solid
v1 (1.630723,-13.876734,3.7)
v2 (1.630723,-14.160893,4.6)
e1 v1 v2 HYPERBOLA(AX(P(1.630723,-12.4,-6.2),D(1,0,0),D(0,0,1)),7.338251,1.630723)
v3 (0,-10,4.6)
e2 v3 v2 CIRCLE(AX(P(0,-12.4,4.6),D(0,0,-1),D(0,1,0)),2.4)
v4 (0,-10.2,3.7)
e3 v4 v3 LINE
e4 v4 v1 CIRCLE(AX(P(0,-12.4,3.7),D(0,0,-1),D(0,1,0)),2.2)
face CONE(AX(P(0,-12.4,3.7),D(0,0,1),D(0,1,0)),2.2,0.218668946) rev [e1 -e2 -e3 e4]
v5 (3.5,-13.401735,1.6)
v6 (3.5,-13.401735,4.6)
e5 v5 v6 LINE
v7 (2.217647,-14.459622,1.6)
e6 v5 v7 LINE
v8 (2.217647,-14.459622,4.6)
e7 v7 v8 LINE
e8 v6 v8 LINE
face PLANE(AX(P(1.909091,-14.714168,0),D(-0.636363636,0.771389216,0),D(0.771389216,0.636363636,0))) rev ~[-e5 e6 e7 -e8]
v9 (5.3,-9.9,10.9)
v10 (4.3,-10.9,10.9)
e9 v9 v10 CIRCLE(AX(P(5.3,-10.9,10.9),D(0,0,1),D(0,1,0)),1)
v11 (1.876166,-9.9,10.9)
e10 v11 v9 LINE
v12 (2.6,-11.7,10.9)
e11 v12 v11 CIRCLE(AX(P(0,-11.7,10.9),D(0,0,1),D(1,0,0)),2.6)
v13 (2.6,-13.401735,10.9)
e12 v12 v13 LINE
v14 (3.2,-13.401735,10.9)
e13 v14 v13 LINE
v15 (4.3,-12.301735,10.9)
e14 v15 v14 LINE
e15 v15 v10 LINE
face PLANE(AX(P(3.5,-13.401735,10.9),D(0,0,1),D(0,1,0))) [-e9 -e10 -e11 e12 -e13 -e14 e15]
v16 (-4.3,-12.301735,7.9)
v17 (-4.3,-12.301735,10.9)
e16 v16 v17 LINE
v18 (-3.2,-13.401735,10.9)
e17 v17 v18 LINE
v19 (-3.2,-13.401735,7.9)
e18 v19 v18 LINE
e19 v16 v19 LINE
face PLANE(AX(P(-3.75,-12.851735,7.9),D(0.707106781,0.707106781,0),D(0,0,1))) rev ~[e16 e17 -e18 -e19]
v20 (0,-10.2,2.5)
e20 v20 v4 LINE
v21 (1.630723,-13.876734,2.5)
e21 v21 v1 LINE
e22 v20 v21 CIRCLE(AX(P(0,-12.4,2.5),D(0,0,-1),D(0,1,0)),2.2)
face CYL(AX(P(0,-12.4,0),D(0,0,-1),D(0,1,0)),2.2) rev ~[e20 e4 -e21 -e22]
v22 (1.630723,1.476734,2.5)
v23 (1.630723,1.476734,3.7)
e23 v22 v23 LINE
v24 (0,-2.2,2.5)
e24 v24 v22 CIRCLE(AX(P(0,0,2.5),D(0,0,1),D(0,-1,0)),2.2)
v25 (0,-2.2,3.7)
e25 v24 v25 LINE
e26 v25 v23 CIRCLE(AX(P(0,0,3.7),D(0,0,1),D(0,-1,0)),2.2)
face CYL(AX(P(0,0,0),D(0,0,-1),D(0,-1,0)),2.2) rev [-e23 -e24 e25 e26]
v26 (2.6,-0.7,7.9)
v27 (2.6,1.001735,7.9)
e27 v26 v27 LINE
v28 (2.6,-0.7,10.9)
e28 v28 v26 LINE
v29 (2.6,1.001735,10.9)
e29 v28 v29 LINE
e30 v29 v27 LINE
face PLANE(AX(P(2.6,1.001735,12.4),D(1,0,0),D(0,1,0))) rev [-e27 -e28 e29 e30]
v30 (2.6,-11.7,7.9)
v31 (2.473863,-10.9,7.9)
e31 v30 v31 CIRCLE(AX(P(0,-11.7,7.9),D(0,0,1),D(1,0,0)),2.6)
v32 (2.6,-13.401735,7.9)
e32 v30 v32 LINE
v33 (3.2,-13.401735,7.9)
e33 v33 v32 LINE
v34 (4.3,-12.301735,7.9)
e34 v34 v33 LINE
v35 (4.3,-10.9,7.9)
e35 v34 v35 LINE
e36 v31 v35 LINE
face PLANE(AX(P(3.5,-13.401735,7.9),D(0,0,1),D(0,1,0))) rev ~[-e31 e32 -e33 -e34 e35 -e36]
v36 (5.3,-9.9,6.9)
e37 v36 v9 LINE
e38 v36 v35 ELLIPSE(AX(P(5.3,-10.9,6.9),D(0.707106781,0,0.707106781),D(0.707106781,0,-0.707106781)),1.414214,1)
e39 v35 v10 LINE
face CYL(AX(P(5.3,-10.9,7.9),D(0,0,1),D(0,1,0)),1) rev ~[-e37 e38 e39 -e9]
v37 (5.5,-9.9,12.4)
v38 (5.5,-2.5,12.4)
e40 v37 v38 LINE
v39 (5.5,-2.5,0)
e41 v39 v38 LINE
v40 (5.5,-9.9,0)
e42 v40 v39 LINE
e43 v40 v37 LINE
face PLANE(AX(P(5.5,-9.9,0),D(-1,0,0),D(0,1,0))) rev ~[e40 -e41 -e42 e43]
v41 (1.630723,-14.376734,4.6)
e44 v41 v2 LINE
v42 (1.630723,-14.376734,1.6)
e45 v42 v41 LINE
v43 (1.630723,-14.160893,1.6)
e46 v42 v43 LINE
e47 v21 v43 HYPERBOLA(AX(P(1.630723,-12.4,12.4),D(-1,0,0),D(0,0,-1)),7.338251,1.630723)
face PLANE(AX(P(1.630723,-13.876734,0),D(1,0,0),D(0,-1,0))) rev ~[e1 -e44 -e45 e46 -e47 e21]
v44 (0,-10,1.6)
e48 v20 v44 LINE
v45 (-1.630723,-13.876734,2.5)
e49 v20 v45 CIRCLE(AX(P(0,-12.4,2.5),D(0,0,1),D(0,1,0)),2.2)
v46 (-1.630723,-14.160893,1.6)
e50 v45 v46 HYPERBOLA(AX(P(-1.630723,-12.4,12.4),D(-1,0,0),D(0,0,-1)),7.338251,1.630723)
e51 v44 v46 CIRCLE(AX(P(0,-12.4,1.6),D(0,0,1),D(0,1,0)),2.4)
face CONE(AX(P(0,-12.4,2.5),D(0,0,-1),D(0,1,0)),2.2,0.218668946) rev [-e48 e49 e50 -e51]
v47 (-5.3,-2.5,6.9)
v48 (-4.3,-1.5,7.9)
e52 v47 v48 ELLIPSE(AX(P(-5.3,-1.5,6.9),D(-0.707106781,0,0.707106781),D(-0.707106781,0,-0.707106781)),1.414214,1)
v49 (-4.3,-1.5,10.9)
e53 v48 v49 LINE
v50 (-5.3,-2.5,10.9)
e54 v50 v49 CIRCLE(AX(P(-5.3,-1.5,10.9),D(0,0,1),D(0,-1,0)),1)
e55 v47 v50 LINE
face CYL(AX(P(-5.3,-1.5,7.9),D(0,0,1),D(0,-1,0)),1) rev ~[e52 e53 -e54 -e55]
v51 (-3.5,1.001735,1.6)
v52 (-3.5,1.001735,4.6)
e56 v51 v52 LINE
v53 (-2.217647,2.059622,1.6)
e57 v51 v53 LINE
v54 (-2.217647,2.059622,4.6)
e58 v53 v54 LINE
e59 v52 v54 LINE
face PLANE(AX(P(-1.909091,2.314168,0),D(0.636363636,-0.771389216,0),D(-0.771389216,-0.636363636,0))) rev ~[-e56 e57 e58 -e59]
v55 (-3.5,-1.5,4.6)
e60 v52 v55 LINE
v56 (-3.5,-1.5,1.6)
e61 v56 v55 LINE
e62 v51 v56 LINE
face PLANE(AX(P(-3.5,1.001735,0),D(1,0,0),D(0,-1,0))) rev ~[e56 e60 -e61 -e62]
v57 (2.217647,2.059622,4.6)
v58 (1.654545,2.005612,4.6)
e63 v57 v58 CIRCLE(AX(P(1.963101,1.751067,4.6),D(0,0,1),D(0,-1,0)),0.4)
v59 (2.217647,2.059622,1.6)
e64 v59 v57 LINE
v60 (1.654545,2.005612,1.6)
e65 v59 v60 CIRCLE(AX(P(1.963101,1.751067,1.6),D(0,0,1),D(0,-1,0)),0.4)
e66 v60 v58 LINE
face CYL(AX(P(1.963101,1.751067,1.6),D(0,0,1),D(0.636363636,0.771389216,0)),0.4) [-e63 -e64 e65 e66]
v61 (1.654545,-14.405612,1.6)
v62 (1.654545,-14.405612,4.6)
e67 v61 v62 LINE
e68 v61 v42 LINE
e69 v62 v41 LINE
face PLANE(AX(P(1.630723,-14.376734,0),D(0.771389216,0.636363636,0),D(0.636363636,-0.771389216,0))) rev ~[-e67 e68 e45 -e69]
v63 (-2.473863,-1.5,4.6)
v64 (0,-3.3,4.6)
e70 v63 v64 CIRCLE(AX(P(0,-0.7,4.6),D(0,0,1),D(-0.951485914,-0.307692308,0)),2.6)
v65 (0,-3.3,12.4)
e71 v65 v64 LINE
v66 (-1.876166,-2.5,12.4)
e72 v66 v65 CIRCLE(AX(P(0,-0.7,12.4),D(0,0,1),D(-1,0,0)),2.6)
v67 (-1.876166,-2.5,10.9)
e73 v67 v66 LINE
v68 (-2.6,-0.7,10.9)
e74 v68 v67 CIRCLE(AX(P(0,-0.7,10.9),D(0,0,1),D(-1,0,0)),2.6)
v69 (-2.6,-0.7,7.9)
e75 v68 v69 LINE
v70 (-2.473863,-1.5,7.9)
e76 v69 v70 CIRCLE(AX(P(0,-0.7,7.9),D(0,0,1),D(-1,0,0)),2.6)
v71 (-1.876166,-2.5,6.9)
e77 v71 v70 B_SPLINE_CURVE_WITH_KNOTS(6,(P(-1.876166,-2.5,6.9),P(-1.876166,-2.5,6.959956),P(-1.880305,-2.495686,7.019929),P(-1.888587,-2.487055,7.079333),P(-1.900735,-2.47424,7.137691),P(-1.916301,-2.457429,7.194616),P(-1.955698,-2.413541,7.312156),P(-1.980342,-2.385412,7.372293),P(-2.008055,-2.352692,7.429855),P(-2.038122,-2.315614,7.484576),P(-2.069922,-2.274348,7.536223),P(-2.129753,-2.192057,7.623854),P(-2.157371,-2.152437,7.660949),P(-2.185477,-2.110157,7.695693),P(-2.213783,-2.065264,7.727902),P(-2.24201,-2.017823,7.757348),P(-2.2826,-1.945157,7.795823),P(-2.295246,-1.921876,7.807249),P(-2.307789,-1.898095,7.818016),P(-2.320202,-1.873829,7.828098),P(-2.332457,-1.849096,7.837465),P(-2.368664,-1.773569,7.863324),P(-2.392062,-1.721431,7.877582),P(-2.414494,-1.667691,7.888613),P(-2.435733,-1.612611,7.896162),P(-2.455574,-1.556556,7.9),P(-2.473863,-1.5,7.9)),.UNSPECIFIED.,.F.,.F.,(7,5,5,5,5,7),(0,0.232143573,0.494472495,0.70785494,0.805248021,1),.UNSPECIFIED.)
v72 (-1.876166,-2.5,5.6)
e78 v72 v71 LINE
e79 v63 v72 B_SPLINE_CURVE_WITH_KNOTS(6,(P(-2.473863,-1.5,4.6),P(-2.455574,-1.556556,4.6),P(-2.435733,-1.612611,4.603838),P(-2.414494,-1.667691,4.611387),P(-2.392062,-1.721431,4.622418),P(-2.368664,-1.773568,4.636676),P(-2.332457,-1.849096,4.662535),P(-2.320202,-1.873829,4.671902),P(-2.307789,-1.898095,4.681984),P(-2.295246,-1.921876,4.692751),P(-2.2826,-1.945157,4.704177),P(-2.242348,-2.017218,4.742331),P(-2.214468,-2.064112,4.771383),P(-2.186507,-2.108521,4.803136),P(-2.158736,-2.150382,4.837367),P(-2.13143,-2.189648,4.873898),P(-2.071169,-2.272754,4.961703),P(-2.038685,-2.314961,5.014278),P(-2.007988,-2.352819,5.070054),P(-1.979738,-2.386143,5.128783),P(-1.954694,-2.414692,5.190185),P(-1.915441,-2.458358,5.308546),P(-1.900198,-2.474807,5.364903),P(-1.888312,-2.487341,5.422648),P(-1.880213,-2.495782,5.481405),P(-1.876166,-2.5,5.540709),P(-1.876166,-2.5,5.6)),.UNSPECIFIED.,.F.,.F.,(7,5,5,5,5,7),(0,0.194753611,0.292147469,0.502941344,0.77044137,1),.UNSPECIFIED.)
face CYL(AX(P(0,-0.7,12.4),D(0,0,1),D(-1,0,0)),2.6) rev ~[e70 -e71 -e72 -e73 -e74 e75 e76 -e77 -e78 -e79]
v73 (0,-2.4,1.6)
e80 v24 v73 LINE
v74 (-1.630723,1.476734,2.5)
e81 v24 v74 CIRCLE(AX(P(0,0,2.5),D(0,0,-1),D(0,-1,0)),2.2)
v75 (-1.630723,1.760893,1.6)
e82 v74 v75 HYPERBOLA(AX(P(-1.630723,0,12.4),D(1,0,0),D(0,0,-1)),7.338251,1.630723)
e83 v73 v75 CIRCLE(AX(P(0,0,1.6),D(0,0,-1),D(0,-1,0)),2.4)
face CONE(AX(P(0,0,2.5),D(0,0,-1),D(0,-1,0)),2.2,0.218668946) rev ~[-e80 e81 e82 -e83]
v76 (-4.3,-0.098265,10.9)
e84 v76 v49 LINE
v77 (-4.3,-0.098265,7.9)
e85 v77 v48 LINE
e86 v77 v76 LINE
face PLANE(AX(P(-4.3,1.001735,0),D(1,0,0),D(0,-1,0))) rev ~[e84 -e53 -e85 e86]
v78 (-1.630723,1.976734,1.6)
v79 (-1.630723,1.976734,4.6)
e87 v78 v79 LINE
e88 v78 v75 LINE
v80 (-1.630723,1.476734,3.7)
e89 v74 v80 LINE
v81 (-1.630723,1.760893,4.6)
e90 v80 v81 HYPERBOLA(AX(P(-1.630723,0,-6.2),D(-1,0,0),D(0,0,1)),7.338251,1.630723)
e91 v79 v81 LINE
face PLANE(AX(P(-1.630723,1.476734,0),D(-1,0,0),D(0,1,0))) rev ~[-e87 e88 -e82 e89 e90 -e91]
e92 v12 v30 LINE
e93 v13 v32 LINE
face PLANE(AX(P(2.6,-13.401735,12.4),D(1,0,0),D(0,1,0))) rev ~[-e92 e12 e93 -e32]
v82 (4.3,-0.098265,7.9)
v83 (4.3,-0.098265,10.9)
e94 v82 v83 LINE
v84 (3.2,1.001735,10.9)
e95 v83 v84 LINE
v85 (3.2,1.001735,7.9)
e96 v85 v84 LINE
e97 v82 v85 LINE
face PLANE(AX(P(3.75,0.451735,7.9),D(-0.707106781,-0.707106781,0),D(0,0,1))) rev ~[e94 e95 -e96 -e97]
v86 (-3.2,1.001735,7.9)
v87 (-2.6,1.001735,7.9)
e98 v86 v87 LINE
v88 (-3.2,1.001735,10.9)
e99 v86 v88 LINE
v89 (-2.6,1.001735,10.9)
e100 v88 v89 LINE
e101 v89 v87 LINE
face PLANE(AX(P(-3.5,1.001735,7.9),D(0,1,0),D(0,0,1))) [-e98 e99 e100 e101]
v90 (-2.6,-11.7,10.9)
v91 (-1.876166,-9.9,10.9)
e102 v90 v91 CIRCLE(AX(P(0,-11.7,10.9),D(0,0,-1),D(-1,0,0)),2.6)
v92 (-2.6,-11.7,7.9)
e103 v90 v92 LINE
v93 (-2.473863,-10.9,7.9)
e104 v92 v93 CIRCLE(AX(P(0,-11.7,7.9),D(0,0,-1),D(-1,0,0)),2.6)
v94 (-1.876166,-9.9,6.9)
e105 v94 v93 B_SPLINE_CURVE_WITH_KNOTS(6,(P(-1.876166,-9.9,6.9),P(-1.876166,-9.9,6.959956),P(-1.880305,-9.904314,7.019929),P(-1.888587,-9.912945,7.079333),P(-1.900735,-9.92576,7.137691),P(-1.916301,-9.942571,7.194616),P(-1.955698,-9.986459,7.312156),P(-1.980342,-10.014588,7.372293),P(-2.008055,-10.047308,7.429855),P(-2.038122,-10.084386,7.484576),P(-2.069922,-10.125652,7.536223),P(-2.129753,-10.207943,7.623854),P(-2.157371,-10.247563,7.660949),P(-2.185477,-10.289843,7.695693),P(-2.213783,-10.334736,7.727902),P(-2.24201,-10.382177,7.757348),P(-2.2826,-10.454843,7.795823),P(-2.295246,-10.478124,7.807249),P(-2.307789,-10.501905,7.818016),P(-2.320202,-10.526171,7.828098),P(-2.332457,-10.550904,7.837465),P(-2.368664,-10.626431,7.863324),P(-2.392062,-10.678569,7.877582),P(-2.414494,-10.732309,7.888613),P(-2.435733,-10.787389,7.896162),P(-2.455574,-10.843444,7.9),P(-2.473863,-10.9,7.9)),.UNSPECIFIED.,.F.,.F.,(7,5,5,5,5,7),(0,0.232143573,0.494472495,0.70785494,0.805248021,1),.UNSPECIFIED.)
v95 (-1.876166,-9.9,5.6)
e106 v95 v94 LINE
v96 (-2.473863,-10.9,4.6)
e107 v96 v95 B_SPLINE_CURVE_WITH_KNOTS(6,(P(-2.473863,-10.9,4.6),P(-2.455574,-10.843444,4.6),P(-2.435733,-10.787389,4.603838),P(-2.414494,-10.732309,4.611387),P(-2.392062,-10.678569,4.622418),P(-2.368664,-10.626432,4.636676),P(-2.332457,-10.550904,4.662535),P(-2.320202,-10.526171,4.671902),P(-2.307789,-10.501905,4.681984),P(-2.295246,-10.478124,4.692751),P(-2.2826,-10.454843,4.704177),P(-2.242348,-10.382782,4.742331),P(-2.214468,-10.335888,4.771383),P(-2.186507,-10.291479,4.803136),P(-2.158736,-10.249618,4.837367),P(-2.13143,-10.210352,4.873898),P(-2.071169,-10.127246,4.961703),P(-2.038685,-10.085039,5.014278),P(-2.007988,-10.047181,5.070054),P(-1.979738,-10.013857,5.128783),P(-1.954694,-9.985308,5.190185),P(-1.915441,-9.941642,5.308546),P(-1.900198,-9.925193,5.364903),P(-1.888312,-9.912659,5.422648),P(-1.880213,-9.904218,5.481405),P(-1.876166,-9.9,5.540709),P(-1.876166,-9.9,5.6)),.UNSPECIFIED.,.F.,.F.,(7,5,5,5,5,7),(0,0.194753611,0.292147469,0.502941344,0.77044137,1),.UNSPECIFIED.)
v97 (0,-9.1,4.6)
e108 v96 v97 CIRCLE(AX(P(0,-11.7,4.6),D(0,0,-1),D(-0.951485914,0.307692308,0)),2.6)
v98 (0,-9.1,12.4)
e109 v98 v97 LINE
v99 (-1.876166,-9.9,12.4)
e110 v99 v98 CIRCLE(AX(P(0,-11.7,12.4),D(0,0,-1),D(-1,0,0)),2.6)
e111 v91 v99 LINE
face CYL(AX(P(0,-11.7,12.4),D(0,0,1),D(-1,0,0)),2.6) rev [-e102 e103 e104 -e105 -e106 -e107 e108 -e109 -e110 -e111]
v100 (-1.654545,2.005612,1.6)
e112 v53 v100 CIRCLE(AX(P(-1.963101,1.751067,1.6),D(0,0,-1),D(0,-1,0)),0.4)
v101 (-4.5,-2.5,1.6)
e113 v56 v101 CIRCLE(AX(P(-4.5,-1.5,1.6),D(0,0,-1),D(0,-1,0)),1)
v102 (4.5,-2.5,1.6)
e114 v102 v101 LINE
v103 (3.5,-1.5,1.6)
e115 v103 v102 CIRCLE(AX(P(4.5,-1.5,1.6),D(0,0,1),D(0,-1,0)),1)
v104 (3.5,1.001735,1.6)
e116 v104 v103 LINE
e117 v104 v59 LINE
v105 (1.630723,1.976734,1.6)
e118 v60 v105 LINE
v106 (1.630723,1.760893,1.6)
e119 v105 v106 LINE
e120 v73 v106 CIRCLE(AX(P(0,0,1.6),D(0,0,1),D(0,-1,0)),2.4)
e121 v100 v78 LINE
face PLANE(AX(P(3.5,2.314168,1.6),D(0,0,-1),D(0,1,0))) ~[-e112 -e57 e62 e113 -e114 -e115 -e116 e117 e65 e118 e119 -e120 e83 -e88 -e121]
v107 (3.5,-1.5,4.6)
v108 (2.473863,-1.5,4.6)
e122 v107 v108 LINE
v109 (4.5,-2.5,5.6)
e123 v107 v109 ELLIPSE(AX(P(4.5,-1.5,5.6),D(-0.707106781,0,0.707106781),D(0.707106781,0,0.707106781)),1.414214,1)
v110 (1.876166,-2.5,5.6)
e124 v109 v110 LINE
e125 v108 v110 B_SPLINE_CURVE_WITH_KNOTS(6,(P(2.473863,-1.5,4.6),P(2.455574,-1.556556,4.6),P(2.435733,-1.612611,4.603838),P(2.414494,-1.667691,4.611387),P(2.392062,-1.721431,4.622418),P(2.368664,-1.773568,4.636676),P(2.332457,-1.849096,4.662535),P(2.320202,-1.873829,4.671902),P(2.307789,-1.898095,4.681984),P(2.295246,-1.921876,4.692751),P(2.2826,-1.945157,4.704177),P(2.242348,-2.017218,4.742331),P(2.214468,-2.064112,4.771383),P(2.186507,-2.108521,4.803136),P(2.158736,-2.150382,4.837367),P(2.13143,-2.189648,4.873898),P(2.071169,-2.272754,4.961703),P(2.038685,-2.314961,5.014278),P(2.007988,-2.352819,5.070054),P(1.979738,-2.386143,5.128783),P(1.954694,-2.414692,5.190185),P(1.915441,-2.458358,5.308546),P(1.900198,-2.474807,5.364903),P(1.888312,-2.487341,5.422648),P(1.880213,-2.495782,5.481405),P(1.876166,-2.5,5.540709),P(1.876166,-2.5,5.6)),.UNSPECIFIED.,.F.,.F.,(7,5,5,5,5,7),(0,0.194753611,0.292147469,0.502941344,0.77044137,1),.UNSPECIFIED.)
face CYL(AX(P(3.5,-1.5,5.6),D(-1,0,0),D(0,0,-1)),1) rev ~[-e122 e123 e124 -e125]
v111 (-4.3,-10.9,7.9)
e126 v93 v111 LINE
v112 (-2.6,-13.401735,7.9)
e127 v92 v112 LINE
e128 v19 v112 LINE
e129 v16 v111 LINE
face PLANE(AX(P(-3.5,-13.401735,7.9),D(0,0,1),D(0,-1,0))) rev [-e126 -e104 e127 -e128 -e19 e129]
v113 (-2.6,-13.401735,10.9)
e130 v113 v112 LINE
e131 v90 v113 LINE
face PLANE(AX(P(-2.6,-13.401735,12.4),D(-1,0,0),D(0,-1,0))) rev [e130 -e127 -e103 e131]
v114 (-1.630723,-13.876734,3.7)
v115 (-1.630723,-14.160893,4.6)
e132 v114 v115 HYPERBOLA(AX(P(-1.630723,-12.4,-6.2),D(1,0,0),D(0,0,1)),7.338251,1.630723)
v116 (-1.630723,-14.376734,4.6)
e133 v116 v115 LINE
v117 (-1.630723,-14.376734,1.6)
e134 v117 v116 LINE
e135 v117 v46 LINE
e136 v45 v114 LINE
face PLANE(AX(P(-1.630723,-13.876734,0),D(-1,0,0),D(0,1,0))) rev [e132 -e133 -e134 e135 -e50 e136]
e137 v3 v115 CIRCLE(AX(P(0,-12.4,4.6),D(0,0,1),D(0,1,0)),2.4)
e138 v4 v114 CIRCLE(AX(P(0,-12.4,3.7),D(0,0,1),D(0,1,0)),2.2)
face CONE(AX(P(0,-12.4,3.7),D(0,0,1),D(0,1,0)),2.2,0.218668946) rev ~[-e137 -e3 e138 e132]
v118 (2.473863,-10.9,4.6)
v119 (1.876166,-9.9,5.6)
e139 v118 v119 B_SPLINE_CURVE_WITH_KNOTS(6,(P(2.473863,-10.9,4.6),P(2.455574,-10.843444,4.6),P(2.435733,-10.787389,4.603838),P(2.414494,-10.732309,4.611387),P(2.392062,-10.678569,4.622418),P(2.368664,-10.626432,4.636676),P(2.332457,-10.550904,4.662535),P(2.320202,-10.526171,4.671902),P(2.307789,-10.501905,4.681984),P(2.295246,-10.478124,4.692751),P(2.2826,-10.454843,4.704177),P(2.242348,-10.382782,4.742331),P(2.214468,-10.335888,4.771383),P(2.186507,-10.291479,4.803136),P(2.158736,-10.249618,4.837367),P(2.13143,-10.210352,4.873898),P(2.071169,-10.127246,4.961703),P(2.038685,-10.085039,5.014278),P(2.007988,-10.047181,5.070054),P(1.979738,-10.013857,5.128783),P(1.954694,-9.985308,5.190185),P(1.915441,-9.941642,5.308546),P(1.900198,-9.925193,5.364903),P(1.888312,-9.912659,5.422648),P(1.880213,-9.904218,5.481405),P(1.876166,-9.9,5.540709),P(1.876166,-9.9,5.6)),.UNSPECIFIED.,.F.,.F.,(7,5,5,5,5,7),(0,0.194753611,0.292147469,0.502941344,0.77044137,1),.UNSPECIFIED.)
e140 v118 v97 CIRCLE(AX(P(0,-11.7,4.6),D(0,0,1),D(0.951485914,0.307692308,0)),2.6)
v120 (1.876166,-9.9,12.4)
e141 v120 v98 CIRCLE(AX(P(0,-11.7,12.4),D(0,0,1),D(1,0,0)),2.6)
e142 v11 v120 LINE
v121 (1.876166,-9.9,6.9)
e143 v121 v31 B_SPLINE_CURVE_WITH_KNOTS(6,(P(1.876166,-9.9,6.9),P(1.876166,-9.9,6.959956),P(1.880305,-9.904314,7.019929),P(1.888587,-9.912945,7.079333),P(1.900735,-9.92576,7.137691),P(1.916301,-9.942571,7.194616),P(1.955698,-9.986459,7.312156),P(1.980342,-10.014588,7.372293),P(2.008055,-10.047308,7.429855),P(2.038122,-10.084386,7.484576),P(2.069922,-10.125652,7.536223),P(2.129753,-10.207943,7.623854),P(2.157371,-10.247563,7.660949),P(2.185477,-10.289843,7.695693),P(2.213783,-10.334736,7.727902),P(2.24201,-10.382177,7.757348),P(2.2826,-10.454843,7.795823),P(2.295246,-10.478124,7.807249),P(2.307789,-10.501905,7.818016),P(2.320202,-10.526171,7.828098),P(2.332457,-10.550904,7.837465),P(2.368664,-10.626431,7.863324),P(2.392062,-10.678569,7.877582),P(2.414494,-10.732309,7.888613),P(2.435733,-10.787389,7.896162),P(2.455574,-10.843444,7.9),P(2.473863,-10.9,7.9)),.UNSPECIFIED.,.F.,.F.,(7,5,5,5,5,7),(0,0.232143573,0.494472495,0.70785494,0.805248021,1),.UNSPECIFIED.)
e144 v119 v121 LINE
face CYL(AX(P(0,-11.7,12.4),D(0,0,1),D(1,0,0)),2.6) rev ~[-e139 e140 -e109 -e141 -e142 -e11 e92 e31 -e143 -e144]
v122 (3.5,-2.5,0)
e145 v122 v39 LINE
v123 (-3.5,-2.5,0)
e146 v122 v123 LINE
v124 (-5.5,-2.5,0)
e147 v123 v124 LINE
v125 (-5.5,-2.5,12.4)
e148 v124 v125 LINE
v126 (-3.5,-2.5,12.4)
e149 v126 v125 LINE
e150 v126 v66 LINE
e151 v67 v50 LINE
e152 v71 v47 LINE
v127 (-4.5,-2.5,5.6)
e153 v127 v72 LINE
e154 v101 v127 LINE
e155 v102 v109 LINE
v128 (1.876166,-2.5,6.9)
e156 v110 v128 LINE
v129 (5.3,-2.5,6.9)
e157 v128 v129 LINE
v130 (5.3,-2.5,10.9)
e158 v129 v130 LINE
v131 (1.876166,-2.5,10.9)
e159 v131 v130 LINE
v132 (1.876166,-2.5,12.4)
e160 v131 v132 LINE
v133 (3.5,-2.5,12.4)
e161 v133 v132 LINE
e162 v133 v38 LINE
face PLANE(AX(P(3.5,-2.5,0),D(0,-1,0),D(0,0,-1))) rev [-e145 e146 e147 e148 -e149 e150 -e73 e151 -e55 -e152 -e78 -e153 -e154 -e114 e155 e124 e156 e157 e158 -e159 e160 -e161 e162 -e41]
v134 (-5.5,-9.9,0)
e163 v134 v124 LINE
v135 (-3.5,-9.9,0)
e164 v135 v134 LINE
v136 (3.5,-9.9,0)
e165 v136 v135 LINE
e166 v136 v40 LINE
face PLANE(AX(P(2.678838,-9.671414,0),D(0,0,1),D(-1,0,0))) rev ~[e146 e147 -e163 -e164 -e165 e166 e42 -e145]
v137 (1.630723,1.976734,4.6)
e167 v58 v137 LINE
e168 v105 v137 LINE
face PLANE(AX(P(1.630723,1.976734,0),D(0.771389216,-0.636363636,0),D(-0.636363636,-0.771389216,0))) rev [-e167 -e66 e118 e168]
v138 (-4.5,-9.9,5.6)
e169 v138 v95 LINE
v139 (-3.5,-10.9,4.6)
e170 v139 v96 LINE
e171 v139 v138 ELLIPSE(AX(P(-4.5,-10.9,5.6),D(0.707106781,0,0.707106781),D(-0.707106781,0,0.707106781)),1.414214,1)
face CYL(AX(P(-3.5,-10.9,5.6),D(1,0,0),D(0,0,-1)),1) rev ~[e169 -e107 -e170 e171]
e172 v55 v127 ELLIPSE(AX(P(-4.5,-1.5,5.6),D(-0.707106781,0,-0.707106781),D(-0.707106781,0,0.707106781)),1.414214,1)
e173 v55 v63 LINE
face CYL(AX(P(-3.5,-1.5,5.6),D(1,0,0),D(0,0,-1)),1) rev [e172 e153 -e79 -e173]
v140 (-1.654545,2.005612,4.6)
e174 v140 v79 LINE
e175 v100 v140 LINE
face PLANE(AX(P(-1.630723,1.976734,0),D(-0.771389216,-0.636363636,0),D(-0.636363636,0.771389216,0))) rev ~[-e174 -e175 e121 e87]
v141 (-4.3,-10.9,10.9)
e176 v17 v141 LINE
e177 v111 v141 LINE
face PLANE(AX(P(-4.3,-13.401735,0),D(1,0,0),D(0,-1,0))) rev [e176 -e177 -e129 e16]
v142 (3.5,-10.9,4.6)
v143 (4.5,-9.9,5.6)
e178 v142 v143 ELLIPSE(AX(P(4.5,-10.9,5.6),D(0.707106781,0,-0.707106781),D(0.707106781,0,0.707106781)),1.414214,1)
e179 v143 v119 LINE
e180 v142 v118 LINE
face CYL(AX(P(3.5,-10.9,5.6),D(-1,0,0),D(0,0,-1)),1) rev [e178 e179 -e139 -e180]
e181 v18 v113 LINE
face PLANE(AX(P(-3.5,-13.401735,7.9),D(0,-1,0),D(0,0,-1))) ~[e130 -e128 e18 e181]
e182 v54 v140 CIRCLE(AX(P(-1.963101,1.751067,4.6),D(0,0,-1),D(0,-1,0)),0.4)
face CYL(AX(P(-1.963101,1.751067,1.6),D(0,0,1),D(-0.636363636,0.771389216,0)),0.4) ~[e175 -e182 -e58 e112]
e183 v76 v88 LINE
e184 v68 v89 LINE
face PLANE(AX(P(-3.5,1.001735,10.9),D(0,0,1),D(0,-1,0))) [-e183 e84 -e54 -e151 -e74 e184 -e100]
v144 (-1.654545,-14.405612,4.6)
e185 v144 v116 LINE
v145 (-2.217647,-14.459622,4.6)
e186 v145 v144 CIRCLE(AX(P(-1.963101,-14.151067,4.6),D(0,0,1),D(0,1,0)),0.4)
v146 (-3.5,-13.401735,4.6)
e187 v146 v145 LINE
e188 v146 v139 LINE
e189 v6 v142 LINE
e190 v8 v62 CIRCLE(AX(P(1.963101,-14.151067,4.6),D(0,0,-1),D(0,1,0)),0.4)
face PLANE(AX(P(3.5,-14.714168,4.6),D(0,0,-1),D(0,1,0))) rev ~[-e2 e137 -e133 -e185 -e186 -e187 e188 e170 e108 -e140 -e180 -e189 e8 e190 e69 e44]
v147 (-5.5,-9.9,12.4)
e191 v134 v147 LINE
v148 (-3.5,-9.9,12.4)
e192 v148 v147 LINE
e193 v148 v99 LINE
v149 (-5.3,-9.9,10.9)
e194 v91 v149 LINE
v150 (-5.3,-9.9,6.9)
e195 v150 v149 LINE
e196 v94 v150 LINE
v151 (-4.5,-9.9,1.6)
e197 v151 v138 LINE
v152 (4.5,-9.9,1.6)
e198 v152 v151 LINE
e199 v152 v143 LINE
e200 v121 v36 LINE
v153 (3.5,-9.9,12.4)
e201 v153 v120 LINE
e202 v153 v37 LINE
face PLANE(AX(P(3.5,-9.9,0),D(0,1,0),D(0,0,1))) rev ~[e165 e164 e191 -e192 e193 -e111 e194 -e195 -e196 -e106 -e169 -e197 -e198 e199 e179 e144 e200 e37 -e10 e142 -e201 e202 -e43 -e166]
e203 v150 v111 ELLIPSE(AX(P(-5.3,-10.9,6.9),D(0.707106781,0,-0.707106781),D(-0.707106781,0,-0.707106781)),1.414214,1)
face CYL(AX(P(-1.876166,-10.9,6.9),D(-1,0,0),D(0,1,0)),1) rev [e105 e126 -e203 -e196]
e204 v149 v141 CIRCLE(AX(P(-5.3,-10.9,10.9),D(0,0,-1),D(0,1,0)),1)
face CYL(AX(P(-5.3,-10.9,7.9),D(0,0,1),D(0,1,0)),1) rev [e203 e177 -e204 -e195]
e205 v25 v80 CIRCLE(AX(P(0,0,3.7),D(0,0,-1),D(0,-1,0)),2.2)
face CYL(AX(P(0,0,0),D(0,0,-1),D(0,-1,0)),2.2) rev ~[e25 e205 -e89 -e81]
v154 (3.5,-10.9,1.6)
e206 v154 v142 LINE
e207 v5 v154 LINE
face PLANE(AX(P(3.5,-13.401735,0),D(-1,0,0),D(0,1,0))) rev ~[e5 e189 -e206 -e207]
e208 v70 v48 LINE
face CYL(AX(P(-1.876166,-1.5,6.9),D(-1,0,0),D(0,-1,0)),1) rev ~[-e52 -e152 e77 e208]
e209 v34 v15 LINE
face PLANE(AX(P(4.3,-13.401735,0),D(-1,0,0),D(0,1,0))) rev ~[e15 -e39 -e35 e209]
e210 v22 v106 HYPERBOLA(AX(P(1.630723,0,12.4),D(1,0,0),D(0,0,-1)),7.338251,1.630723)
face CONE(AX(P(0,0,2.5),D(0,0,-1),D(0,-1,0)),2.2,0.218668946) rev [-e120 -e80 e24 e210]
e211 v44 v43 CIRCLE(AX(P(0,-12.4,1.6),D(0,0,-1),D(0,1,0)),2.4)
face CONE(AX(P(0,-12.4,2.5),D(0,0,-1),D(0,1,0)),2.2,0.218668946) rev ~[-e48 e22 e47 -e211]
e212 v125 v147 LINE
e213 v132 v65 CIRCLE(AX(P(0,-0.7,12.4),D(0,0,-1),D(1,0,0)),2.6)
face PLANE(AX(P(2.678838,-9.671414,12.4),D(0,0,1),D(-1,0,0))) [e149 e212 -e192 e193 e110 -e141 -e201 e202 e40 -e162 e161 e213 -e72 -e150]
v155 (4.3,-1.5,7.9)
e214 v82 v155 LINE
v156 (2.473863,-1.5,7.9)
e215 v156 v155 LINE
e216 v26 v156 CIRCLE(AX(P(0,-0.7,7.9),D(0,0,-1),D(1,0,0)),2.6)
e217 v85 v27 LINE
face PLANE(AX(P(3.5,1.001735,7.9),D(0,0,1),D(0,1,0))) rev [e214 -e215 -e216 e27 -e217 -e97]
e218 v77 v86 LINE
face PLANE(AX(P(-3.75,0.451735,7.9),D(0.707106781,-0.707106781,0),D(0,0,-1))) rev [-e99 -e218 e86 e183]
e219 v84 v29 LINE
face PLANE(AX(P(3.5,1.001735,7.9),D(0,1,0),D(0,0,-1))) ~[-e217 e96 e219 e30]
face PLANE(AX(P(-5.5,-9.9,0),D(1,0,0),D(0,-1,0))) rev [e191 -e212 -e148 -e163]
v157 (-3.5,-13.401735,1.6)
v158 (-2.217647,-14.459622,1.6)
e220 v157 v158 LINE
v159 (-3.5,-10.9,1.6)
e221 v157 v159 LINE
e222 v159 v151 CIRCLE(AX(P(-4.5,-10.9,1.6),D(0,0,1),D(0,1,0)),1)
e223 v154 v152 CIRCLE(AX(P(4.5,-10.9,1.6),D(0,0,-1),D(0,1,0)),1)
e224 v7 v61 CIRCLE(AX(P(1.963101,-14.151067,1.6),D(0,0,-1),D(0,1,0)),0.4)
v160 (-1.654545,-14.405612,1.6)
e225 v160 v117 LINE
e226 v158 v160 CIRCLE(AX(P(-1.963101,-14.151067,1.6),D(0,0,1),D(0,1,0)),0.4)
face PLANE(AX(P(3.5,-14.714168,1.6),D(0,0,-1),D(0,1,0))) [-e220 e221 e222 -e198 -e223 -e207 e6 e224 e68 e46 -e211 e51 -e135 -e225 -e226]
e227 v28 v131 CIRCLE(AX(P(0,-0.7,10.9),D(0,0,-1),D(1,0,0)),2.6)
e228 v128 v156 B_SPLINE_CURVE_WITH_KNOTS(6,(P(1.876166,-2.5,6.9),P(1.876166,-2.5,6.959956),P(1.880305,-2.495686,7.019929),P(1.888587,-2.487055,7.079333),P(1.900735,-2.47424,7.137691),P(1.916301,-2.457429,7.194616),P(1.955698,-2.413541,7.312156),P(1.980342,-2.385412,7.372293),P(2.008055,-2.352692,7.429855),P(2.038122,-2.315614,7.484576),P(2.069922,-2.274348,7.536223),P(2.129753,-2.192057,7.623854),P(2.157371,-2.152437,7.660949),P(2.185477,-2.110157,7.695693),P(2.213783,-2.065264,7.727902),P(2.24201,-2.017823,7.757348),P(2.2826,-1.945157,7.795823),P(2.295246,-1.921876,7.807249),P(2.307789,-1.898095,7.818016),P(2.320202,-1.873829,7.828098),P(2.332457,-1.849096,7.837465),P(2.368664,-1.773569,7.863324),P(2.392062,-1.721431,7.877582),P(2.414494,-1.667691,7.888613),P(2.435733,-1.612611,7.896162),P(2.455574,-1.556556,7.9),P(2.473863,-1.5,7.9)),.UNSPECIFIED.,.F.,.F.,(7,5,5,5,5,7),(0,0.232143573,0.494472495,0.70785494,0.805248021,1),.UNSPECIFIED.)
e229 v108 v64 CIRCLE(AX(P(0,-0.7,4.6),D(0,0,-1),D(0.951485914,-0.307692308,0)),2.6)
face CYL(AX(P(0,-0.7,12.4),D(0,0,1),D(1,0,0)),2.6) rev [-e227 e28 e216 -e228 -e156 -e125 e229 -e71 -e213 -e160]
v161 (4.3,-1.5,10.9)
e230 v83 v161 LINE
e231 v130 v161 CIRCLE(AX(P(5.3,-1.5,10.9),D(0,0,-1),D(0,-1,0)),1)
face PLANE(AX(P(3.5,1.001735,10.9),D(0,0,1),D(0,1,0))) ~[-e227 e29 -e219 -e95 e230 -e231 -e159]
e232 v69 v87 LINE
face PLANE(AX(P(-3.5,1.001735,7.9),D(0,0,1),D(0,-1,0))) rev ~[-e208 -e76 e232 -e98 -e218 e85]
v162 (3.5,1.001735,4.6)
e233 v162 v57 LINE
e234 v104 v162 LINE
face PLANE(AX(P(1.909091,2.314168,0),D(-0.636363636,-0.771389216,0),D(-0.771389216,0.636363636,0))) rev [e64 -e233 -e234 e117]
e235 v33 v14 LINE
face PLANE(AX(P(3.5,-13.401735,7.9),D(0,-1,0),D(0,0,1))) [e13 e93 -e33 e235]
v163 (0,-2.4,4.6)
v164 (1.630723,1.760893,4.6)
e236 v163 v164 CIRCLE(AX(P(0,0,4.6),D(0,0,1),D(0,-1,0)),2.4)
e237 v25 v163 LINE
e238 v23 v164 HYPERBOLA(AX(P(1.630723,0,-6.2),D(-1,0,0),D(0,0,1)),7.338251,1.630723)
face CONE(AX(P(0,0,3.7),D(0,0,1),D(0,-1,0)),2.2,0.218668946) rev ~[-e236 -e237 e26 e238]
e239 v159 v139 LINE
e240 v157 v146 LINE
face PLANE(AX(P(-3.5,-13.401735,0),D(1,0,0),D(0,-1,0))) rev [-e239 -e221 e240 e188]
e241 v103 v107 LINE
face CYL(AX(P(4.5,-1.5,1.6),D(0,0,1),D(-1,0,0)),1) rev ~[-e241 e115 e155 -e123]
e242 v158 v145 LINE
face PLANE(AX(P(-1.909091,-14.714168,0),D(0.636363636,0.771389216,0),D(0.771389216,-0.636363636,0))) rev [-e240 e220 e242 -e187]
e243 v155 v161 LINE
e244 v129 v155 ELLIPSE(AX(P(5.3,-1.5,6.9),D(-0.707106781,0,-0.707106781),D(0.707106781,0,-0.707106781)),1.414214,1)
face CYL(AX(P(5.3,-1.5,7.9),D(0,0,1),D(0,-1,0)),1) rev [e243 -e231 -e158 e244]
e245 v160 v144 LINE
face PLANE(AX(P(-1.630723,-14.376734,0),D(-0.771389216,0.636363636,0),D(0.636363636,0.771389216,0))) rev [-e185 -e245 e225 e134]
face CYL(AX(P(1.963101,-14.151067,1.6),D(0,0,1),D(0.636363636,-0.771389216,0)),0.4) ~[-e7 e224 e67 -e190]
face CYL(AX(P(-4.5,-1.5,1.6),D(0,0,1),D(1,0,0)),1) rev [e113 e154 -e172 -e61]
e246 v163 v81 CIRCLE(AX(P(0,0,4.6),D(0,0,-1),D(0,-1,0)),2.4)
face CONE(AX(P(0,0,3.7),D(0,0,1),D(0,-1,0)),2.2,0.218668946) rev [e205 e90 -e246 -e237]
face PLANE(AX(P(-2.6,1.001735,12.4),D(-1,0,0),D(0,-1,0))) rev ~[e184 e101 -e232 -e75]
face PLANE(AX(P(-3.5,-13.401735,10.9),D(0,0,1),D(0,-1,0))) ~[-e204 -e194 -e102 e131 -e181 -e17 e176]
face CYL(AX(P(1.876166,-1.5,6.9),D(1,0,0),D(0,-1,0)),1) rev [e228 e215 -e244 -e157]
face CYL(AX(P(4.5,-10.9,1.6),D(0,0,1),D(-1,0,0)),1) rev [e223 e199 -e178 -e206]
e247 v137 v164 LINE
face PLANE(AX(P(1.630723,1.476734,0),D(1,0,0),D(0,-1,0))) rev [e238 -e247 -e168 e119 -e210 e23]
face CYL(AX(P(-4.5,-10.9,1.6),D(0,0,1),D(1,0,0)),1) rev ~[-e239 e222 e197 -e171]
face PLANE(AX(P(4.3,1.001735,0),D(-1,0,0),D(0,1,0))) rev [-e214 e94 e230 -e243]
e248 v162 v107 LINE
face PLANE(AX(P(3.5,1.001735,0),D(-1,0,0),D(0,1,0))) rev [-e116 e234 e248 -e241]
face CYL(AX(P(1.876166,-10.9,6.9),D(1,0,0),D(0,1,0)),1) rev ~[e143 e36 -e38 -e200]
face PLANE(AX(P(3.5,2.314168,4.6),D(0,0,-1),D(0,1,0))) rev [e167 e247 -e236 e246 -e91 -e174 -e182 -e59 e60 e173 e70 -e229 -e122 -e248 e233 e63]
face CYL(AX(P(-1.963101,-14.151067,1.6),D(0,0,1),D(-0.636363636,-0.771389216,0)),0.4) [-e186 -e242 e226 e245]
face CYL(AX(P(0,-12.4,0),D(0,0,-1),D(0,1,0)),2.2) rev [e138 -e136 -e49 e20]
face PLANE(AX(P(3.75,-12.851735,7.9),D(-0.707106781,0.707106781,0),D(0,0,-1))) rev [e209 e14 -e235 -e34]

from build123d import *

# Parameters (mm, degrees)
F1_DEPTH  = 12.4
F2_W      = 4.8141676475
F2_H      = 3.3
F2_H_2    = 1.6
F2_H_3    = 1.5
F3_DEPTH  = 25
F5_DEPTH  = 7.8
F6_DEPTH  = 0.8
F7_SIZE   = 1.1
F8_R      = 0.4
F9_R      = 1
F10_SIZE2 = 0.2
F10_SIZE  = 0.9


# Not quite as in the source:
# - a feature of the source that left no trace in its solid (it failed there, or was rolled back) is left out


with BuildPart() as f1:
    # F0 (on Top) → F1 (new body)
    with BuildSketch(Plane.XY):
        with BuildLine():
            ThreePointArc((0, -2.2), (-2.0110712703, -0.8919598342), (-1.6307225426, 1.476734231))
            Line((-1.6307225426, 1.476734231), (-1.6307225426, 1.976734231))
            Line((-1.6307225426, 1.976734231), (-1.9090909091, 2.3141676475))
            Line((-1.9090909091, 2.3141676475), (-3.5, 1.0017346067))
            Line((-3.5, 1.0017346067), (-3.5, -2.5))
            Line((-3.5, -2.5), (-5.5, -2.5))
            Line((-5.5, -2.5), (-5.5, -6.2))
            Line((-5.5, -6.2), (0, -6.2))
            Line((0, -6.2), (0, -2.2))
        make_face()
    extrude(amount=F1_DEPTH)

    # F2 (on face) → F3 (cut)
    with BuildSketch(Plane(origin=(-3.5, 0, 0), x_dir=(0, -1, 0), z_dir=(-1, 0, 0))):
        with Locations((0.0929161762, 6.25)):
            Rectangle(F2_W, F2_H)
        with Locations((0.0929161762, 0.8)):
            Rectangle(F2_W, F2_H_2)
        with Locations((0.0929161762, 11.65)):
            Rectangle(F2_W, F2_H_3)
    extrude(amount=-F3_DEPTH, mode=Mode.SUBTRACT)

    # F4 (on face) → F5 (cut, through all)
    with BuildSketch(Plane.XY.offset(12.4)):
        with BuildLine():
            Line((-2.6, 1.0017346067), (-2.6, -0.7))
            ThreePointArc((-2.6, -0.7), (-1.8384776311, -2.5384776311), (0, -3.3))
            Line((0, -3.3), (0, -2.2))
            ThreePointArc((0, -2.2), (-2.0110712703, -0.8919598342), (-1.6307225426, 1.476734231))
            Line((-1.6307225426, 1.476734231), (-1.6307225426, 1.976734231))
            Line((-1.6307225426, 1.976734231), (-1.9090909091, 2.3141676475))
            Line((-1.9090909091, 2.3141676475), (-3.5, 1.0017346067))
            Line((-3.5, 1.0017346067), (-2.6, 1.0017346067))
        make_face()
    extrude(amount=-F5_DEPTH, mode=Mode.SUBTRACT)

    # F6 (add): a face of the model
    f6_faces = [f1.faces().sort_by_distance(p)[0] for p in [
        (-3.5, -0.7491326967, 9.4),
    ]]
    extrude(f6_faces, amount=F6_DEPTH)

    # F7
    f7_edges = [f1.edges().sort_by_distance(p)[0] for p in [
        (-4.3, 1.001735, 9.4),
    ]]
    chamfer(f7_edges, length=F7_SIZE)

    # F8
    f8_edges = [f1.edges().sort_by_distance(p)[0] for p in [
        (-1.909091, 2.314168, 3.1),
    ]]
    fillet(f8_edges, radius=F8_R)

    # F9
    f9_edges = [f1.edges().sort_by_distance(p)[0] for p in [
        (-3.5, -2.5, 3.1),
        (-2.688083, -2.5, 4.6),
        (-3.088083, -2.5, 7.9),
        (-4.3, -2.5, 9.4),
    ]]
    fillet(f9_edges, radius=F9_R)

    # F10
    f10_edges = [f1.edges().sort_by_distance(p)[0] for p in [
        (-2.011071, -0.89196, 1.6),
        (-2.011071, -0.89196, 4.6),
    ]]
    f10_side = f1.faces().sort_by_distance((-2.011071, -0.89196, 3.1))[0]
    chamfer(f10_edges, length=F10_SIZE, length2=F10_SIZE2, reference=f10_side)

    # F11: F1 across face


with BuildPart() as f1_1:
    add(f1.part)
    add(f1.part.mirror(Plane(origin=(0, -4.5388751239, 5.7890981169), x_dir=(0, 1, 0), z_dir=(1, 0, 0))))

    # F12: F1 across face


with BuildPart() as f1_2:
    add(f1_1.part)
    add(f1_1.part.mirror(Plane(origin=(0, -6.2, 6.2), x_dir=(1, 0, 0), z_dir=(0, -1, 0))))


solid = f1_2.part
